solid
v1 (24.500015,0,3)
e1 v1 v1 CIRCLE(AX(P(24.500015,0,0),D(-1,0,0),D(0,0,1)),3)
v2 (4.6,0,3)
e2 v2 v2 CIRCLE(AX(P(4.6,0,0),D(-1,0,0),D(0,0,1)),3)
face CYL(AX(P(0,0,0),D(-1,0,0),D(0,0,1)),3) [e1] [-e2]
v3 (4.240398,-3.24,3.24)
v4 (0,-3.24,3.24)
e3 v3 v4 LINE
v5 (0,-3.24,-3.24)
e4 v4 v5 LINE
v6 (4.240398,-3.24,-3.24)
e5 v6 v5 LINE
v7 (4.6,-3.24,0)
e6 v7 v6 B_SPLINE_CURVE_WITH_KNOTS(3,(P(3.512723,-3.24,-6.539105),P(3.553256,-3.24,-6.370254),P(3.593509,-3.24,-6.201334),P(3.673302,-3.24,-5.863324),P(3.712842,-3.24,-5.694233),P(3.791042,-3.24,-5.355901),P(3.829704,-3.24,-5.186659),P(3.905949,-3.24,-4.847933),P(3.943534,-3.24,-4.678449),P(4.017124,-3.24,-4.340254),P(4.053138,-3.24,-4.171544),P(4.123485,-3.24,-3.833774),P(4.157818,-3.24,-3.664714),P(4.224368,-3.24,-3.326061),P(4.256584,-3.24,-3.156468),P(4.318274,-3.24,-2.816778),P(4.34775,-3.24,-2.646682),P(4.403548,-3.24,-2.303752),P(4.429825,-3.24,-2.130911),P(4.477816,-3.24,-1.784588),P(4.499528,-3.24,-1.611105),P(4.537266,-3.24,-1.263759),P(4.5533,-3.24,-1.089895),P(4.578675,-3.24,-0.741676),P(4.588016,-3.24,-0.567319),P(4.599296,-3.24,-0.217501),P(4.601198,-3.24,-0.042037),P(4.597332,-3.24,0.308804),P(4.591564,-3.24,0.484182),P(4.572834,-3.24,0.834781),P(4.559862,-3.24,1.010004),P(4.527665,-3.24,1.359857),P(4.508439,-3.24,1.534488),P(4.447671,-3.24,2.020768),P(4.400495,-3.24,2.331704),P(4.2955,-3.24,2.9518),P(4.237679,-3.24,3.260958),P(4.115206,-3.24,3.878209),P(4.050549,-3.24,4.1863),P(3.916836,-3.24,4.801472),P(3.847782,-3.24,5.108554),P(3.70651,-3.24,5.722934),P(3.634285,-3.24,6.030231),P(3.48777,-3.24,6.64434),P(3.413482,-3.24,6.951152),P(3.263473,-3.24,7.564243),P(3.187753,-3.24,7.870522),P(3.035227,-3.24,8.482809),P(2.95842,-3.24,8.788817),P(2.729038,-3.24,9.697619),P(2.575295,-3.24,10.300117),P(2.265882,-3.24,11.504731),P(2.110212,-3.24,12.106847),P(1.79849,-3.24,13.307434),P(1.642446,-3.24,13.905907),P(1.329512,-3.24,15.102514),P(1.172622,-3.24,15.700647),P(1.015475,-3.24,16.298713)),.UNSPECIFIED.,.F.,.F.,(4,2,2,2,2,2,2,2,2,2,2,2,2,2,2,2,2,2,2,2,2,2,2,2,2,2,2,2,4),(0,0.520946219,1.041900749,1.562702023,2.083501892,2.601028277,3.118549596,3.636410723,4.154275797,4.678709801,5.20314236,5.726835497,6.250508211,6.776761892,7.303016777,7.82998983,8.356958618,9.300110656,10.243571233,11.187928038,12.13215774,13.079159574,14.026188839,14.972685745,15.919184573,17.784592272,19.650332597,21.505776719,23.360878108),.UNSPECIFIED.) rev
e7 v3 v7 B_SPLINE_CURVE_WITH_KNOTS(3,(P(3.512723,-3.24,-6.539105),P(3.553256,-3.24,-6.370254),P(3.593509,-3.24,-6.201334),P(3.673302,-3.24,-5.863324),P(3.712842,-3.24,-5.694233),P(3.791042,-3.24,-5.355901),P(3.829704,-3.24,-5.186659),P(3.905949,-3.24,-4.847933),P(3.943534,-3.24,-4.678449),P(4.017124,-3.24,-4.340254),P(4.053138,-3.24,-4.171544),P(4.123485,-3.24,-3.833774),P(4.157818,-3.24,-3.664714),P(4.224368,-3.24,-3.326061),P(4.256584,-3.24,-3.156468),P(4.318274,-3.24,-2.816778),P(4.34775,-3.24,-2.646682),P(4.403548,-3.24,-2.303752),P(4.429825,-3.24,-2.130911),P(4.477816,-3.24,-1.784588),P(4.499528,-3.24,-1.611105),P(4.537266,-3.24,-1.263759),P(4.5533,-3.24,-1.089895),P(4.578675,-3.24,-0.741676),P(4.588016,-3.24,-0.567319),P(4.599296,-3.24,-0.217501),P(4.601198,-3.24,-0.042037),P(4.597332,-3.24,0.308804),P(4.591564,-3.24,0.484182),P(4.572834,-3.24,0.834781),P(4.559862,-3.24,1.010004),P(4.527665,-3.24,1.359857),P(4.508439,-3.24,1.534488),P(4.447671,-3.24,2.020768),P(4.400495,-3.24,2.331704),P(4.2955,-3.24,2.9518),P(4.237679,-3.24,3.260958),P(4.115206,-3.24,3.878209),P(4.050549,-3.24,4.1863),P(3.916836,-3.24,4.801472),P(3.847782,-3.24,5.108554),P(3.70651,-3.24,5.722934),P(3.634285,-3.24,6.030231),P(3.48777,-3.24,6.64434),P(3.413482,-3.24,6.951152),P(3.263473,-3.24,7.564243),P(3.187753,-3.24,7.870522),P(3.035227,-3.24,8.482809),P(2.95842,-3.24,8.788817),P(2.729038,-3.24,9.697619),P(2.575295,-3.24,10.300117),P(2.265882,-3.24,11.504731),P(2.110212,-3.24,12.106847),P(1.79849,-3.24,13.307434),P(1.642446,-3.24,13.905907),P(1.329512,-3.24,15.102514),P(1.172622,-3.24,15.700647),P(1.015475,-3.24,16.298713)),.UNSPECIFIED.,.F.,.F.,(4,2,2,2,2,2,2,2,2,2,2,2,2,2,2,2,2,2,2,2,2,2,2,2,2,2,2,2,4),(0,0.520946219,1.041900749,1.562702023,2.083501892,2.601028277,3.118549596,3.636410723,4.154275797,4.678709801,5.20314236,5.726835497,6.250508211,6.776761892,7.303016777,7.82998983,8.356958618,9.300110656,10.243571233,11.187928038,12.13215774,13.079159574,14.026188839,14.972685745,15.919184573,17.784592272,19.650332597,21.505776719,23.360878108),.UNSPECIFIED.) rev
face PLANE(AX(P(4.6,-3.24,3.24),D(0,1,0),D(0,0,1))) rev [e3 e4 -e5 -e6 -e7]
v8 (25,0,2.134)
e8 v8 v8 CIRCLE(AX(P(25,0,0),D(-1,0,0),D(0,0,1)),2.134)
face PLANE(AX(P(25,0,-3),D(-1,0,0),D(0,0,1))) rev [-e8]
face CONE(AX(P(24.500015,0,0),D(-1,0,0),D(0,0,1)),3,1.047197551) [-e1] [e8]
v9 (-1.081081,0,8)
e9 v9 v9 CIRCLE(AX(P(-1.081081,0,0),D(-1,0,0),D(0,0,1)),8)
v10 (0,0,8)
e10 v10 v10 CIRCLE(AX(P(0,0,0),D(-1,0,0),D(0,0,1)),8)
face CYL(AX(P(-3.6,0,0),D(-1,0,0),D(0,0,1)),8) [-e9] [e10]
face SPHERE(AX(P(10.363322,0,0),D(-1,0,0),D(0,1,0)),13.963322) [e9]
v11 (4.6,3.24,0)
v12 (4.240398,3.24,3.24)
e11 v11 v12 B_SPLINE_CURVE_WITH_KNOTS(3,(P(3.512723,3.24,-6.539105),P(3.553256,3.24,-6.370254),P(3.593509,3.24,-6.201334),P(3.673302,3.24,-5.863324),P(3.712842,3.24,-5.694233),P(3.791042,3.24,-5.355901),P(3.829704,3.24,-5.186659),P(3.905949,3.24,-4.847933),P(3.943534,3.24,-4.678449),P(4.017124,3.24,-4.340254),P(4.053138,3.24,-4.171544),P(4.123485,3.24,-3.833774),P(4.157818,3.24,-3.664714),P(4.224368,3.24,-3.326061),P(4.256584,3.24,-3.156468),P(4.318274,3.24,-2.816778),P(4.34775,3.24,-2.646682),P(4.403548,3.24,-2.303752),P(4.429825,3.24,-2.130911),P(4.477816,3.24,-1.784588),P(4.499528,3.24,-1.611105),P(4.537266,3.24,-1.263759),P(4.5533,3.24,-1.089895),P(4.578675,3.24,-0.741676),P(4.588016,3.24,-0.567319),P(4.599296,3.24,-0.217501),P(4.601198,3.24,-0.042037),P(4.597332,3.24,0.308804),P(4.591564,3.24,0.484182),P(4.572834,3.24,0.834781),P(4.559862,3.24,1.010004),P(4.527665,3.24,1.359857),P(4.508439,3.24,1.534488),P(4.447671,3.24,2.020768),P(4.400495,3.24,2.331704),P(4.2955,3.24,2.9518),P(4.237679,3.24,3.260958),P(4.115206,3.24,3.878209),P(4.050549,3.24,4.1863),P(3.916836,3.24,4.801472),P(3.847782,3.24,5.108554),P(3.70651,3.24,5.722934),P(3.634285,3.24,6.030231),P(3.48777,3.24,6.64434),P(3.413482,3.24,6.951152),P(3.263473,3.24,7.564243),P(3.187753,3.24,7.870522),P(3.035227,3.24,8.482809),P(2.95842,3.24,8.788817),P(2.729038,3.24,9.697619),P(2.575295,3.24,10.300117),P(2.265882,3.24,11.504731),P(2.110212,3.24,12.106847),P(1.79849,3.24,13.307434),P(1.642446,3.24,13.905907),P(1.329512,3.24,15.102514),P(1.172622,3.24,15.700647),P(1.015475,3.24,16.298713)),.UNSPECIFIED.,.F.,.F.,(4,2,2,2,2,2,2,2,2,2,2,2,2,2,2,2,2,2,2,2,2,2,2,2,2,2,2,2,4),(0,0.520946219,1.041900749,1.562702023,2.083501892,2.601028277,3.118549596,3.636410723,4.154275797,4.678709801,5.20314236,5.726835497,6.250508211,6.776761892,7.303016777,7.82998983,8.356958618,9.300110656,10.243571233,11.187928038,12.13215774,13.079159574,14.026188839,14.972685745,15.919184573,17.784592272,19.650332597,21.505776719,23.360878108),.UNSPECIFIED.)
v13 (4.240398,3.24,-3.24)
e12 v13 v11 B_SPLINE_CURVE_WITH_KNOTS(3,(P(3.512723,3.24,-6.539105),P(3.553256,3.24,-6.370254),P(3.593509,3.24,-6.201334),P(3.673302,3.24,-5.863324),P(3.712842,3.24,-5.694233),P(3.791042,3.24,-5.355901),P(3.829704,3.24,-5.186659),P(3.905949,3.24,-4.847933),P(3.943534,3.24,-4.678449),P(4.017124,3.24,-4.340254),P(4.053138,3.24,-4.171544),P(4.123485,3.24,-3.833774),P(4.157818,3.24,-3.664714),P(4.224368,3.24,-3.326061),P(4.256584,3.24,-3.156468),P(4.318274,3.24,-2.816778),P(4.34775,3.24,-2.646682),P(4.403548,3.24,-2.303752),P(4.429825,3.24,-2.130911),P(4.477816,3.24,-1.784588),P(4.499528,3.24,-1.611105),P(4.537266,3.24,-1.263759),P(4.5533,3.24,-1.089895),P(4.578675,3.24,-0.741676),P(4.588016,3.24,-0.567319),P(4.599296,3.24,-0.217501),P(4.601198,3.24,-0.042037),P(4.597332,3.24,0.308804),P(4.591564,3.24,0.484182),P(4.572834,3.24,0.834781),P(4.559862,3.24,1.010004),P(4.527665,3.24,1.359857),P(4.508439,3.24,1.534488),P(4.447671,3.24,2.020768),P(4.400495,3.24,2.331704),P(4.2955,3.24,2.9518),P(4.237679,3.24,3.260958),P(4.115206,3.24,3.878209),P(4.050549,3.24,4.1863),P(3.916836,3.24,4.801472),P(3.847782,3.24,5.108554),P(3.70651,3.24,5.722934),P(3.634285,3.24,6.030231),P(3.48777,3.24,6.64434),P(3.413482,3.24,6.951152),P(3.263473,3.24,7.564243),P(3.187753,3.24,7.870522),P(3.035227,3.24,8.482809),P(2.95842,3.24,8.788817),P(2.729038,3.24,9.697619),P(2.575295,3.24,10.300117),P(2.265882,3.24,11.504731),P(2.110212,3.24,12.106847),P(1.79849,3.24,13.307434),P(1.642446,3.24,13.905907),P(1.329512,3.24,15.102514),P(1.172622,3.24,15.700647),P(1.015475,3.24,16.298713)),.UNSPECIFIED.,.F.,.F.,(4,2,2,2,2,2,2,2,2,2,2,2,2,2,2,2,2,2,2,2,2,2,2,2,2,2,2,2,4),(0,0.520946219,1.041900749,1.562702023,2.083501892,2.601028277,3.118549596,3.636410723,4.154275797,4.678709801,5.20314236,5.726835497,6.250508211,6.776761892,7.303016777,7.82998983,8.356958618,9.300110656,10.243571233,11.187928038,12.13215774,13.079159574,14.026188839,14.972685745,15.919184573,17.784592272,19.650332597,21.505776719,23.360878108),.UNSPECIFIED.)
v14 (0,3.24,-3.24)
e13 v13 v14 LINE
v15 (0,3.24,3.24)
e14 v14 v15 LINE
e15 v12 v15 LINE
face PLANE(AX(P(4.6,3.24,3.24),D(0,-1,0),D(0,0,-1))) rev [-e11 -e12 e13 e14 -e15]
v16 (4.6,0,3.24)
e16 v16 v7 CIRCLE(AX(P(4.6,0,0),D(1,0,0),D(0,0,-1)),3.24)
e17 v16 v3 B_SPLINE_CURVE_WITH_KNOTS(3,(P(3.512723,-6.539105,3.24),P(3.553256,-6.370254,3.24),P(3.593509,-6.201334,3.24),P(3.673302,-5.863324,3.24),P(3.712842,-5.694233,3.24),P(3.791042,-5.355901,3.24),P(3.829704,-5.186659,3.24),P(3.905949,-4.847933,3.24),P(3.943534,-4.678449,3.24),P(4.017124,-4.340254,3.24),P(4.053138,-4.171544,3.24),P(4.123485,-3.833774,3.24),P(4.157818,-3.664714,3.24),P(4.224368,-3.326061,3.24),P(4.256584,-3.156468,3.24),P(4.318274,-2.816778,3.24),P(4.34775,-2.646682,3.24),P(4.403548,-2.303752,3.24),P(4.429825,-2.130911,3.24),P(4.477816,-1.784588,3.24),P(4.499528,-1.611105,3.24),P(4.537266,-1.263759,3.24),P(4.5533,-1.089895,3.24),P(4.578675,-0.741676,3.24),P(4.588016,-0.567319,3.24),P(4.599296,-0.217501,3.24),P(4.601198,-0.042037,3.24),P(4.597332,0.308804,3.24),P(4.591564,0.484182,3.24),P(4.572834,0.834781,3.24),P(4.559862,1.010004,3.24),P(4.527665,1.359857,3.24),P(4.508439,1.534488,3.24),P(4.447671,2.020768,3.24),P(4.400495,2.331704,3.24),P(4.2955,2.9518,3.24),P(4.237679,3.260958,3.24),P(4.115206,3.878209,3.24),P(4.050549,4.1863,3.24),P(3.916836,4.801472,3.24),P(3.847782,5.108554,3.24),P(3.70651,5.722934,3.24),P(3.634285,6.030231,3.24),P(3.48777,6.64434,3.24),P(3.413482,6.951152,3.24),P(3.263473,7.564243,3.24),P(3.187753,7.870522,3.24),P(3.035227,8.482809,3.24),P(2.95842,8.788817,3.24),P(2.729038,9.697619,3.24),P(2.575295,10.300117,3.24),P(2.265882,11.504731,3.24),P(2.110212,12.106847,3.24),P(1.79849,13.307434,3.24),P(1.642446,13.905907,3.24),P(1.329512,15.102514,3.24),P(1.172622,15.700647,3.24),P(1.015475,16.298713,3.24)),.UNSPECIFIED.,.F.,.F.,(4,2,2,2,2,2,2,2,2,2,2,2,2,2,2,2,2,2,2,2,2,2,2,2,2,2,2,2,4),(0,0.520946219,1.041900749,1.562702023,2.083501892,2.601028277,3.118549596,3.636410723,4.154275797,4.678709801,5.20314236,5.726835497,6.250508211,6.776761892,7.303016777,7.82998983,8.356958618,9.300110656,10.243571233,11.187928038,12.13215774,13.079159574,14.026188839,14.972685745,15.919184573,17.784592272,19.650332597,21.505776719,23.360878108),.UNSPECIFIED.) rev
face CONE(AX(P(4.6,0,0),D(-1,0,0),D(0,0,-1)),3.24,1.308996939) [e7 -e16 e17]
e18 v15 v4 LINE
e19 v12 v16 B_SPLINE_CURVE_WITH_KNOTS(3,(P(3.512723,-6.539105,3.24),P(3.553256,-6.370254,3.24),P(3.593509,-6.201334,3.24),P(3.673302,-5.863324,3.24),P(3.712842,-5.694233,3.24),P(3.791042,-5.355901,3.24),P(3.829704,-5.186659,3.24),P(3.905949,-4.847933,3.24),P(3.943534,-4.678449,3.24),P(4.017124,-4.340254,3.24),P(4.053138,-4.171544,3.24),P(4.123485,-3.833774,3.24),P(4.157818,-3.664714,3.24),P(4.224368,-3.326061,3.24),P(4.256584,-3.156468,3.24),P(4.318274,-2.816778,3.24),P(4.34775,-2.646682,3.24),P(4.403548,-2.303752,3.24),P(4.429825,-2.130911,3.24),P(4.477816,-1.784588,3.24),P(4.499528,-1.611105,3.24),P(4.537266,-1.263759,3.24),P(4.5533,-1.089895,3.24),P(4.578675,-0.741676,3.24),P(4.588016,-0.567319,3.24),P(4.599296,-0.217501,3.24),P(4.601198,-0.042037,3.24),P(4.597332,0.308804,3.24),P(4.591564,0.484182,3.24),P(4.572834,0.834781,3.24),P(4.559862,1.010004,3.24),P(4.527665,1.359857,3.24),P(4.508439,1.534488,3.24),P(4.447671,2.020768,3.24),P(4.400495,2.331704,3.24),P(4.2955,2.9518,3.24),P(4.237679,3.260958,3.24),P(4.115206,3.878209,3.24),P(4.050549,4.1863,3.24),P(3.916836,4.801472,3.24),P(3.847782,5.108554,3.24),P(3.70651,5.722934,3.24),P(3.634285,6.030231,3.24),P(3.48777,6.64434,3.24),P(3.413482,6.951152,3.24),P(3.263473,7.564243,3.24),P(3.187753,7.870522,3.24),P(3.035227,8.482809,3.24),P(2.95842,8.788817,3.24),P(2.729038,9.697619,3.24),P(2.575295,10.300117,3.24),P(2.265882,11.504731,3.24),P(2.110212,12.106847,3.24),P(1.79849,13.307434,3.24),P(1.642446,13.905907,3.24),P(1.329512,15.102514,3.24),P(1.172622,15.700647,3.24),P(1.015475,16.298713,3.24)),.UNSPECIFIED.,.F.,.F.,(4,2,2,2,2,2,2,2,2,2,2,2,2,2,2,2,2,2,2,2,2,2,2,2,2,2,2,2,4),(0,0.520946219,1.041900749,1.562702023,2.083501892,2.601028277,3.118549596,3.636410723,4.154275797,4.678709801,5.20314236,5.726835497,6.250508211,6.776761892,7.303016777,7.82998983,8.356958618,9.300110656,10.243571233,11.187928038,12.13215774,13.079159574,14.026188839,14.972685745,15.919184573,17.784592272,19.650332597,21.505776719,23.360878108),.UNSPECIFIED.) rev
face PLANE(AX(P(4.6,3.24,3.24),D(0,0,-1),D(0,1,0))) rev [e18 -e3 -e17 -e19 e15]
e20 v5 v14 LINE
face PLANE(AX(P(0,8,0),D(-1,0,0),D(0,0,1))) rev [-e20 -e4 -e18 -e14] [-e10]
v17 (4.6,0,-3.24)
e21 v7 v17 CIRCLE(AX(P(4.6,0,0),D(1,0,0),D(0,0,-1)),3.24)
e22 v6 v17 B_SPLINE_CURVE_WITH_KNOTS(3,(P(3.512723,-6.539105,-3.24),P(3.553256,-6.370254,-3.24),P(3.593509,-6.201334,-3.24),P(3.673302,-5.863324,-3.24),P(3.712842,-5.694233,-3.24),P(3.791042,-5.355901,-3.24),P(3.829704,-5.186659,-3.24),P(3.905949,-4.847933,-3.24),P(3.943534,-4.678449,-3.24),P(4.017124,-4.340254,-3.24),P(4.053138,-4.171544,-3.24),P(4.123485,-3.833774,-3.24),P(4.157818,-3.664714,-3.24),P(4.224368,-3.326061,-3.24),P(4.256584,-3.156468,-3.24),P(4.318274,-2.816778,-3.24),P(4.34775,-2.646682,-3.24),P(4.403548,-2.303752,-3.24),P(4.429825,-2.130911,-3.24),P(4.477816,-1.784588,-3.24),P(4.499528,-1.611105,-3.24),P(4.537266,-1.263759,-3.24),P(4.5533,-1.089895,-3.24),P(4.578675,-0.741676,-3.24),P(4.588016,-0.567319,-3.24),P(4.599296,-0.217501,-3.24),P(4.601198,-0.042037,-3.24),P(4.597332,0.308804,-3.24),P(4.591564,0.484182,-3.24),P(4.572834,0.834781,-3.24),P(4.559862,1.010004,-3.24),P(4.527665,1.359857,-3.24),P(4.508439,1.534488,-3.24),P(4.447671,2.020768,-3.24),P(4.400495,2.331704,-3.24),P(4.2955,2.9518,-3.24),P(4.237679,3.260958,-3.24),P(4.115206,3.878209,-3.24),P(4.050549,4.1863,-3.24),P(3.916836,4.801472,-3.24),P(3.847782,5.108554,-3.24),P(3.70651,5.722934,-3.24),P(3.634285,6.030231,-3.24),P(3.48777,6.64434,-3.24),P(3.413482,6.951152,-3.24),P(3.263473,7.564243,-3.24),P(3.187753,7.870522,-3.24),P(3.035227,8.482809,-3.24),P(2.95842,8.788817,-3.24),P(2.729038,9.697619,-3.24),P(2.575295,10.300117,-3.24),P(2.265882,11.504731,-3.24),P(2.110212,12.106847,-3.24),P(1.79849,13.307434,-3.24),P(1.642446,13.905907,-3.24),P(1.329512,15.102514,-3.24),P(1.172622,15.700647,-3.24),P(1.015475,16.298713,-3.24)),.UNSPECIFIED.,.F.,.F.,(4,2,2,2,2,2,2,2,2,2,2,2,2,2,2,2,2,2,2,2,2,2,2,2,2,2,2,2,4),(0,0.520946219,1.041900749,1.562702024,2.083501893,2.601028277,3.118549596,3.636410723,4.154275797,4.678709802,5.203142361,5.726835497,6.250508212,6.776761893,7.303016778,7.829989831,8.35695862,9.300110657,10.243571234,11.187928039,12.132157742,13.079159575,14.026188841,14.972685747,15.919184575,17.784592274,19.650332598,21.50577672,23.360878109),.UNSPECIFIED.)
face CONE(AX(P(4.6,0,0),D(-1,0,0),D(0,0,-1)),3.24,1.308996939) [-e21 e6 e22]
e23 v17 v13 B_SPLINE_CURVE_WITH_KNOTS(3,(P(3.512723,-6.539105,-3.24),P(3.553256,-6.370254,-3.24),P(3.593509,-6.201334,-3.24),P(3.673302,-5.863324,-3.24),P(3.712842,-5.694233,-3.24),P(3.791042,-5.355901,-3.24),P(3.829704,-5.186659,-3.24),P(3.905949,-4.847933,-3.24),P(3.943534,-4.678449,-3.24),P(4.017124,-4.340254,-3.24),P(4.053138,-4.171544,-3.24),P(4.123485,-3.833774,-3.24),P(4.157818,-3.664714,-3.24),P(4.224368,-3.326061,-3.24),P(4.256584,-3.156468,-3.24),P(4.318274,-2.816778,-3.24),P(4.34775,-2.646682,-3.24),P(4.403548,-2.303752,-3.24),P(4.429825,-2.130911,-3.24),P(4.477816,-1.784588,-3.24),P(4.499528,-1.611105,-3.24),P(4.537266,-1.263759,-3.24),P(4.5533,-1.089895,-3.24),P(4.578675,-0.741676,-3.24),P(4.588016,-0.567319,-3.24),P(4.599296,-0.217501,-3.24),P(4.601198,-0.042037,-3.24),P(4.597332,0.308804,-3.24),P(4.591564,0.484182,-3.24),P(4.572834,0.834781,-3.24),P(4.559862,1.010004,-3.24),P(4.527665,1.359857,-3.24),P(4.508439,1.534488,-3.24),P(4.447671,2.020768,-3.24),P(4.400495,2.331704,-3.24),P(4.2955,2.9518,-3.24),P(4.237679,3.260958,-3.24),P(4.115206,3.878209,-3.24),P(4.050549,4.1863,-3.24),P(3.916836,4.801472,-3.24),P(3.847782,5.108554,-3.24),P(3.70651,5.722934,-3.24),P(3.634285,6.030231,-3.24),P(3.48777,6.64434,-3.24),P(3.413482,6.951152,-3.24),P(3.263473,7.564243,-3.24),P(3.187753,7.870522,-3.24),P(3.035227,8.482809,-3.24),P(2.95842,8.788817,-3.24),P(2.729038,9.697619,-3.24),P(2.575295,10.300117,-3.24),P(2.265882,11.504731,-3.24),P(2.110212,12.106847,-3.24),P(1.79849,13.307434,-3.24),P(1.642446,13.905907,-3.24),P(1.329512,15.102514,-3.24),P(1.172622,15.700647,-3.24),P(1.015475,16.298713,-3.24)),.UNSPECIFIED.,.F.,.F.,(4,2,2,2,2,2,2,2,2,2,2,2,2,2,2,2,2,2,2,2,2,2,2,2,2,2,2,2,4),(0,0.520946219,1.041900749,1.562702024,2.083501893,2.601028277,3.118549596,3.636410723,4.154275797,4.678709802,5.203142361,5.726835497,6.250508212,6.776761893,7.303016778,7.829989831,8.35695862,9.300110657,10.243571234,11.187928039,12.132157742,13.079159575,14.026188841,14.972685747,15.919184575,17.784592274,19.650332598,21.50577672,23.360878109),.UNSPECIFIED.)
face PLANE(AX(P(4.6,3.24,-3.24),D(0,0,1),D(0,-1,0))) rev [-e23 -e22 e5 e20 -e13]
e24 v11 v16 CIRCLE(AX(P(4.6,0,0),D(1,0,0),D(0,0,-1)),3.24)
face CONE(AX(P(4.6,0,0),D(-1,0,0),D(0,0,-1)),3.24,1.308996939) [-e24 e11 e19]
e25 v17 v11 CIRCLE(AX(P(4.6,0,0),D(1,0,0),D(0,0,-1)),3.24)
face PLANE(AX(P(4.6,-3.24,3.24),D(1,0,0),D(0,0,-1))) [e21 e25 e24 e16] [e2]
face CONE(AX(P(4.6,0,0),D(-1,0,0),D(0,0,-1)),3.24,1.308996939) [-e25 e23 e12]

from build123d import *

# Parameters (mm, degrees)
CUT_REVOLVE_1_2_OUTLINE_W = 6.48
CUT_REVOLVE_1_2_OUTLINE_H = 6.48
CUT_REVOLVE_1_2_DEPTH     = 4.6


with BuildPart() as part:
    # 草图1 → Revolve 699 (revolve)
    with BuildSketch(Plane.XY):
        with BuildLine():
            Line((-1.081081081, 8), (0, 8))
            Line((0, 8), (0, 0))
            Line((0, 0), (-3.6, 0))
            ThreePointArc((-3.6, 0), (-2.955391275, 4.193594893), (-1.081081081, 8))
        make_face()
    revolve(axis=Axis((-3.6, 0, 0), (1, 0, 0)))



with BuildPart() as body_2:
    # 切除-旋转1: read off the stored shape, not the designer's step
    # 切除-旋转1 outline → 切除-旋转1 (revolve)
    with BuildSketch(Plane.YX):
        Polygon((3, 24.500014667), (2.134, 25), (0, 25), (0, 4.240398306), (3, 4.240398306), align=None)
    revolve(axis=Axis((0, 0, 0), (1, 0, 0)))


with BuildPart() as part_1:
    add(part.part)

    add(body_2.part)  # Cut-Revolve 1 2 merges body 2
    # Cut-Revolve 1 2 outline → Cut-Revolve 1 2 (add)
    with BuildSketch(Plane.YZ):
        Rectangle(CUT_REVOLVE_1_2_OUTLINE_W, CUT_REVOLVE_1_2_OUTLINE_H)
    extrude(amount=CUT_REVOLVE_1_2_DEPTH)

    # Cut-Revolve 1 3 outline → Cut-Revolve 1 3 (revolve, cut)
    with BuildSketch(Plane.YX):
        Polygon((4.582051794, 4.6), (3.24, 4.6), (4.582051794, 4.240398306), align=None)
    revolve(axis=Axis((0, 0, 0), (1, 0, 0)), mode=Mode.SUBTRACT)


solid = part_1.part
